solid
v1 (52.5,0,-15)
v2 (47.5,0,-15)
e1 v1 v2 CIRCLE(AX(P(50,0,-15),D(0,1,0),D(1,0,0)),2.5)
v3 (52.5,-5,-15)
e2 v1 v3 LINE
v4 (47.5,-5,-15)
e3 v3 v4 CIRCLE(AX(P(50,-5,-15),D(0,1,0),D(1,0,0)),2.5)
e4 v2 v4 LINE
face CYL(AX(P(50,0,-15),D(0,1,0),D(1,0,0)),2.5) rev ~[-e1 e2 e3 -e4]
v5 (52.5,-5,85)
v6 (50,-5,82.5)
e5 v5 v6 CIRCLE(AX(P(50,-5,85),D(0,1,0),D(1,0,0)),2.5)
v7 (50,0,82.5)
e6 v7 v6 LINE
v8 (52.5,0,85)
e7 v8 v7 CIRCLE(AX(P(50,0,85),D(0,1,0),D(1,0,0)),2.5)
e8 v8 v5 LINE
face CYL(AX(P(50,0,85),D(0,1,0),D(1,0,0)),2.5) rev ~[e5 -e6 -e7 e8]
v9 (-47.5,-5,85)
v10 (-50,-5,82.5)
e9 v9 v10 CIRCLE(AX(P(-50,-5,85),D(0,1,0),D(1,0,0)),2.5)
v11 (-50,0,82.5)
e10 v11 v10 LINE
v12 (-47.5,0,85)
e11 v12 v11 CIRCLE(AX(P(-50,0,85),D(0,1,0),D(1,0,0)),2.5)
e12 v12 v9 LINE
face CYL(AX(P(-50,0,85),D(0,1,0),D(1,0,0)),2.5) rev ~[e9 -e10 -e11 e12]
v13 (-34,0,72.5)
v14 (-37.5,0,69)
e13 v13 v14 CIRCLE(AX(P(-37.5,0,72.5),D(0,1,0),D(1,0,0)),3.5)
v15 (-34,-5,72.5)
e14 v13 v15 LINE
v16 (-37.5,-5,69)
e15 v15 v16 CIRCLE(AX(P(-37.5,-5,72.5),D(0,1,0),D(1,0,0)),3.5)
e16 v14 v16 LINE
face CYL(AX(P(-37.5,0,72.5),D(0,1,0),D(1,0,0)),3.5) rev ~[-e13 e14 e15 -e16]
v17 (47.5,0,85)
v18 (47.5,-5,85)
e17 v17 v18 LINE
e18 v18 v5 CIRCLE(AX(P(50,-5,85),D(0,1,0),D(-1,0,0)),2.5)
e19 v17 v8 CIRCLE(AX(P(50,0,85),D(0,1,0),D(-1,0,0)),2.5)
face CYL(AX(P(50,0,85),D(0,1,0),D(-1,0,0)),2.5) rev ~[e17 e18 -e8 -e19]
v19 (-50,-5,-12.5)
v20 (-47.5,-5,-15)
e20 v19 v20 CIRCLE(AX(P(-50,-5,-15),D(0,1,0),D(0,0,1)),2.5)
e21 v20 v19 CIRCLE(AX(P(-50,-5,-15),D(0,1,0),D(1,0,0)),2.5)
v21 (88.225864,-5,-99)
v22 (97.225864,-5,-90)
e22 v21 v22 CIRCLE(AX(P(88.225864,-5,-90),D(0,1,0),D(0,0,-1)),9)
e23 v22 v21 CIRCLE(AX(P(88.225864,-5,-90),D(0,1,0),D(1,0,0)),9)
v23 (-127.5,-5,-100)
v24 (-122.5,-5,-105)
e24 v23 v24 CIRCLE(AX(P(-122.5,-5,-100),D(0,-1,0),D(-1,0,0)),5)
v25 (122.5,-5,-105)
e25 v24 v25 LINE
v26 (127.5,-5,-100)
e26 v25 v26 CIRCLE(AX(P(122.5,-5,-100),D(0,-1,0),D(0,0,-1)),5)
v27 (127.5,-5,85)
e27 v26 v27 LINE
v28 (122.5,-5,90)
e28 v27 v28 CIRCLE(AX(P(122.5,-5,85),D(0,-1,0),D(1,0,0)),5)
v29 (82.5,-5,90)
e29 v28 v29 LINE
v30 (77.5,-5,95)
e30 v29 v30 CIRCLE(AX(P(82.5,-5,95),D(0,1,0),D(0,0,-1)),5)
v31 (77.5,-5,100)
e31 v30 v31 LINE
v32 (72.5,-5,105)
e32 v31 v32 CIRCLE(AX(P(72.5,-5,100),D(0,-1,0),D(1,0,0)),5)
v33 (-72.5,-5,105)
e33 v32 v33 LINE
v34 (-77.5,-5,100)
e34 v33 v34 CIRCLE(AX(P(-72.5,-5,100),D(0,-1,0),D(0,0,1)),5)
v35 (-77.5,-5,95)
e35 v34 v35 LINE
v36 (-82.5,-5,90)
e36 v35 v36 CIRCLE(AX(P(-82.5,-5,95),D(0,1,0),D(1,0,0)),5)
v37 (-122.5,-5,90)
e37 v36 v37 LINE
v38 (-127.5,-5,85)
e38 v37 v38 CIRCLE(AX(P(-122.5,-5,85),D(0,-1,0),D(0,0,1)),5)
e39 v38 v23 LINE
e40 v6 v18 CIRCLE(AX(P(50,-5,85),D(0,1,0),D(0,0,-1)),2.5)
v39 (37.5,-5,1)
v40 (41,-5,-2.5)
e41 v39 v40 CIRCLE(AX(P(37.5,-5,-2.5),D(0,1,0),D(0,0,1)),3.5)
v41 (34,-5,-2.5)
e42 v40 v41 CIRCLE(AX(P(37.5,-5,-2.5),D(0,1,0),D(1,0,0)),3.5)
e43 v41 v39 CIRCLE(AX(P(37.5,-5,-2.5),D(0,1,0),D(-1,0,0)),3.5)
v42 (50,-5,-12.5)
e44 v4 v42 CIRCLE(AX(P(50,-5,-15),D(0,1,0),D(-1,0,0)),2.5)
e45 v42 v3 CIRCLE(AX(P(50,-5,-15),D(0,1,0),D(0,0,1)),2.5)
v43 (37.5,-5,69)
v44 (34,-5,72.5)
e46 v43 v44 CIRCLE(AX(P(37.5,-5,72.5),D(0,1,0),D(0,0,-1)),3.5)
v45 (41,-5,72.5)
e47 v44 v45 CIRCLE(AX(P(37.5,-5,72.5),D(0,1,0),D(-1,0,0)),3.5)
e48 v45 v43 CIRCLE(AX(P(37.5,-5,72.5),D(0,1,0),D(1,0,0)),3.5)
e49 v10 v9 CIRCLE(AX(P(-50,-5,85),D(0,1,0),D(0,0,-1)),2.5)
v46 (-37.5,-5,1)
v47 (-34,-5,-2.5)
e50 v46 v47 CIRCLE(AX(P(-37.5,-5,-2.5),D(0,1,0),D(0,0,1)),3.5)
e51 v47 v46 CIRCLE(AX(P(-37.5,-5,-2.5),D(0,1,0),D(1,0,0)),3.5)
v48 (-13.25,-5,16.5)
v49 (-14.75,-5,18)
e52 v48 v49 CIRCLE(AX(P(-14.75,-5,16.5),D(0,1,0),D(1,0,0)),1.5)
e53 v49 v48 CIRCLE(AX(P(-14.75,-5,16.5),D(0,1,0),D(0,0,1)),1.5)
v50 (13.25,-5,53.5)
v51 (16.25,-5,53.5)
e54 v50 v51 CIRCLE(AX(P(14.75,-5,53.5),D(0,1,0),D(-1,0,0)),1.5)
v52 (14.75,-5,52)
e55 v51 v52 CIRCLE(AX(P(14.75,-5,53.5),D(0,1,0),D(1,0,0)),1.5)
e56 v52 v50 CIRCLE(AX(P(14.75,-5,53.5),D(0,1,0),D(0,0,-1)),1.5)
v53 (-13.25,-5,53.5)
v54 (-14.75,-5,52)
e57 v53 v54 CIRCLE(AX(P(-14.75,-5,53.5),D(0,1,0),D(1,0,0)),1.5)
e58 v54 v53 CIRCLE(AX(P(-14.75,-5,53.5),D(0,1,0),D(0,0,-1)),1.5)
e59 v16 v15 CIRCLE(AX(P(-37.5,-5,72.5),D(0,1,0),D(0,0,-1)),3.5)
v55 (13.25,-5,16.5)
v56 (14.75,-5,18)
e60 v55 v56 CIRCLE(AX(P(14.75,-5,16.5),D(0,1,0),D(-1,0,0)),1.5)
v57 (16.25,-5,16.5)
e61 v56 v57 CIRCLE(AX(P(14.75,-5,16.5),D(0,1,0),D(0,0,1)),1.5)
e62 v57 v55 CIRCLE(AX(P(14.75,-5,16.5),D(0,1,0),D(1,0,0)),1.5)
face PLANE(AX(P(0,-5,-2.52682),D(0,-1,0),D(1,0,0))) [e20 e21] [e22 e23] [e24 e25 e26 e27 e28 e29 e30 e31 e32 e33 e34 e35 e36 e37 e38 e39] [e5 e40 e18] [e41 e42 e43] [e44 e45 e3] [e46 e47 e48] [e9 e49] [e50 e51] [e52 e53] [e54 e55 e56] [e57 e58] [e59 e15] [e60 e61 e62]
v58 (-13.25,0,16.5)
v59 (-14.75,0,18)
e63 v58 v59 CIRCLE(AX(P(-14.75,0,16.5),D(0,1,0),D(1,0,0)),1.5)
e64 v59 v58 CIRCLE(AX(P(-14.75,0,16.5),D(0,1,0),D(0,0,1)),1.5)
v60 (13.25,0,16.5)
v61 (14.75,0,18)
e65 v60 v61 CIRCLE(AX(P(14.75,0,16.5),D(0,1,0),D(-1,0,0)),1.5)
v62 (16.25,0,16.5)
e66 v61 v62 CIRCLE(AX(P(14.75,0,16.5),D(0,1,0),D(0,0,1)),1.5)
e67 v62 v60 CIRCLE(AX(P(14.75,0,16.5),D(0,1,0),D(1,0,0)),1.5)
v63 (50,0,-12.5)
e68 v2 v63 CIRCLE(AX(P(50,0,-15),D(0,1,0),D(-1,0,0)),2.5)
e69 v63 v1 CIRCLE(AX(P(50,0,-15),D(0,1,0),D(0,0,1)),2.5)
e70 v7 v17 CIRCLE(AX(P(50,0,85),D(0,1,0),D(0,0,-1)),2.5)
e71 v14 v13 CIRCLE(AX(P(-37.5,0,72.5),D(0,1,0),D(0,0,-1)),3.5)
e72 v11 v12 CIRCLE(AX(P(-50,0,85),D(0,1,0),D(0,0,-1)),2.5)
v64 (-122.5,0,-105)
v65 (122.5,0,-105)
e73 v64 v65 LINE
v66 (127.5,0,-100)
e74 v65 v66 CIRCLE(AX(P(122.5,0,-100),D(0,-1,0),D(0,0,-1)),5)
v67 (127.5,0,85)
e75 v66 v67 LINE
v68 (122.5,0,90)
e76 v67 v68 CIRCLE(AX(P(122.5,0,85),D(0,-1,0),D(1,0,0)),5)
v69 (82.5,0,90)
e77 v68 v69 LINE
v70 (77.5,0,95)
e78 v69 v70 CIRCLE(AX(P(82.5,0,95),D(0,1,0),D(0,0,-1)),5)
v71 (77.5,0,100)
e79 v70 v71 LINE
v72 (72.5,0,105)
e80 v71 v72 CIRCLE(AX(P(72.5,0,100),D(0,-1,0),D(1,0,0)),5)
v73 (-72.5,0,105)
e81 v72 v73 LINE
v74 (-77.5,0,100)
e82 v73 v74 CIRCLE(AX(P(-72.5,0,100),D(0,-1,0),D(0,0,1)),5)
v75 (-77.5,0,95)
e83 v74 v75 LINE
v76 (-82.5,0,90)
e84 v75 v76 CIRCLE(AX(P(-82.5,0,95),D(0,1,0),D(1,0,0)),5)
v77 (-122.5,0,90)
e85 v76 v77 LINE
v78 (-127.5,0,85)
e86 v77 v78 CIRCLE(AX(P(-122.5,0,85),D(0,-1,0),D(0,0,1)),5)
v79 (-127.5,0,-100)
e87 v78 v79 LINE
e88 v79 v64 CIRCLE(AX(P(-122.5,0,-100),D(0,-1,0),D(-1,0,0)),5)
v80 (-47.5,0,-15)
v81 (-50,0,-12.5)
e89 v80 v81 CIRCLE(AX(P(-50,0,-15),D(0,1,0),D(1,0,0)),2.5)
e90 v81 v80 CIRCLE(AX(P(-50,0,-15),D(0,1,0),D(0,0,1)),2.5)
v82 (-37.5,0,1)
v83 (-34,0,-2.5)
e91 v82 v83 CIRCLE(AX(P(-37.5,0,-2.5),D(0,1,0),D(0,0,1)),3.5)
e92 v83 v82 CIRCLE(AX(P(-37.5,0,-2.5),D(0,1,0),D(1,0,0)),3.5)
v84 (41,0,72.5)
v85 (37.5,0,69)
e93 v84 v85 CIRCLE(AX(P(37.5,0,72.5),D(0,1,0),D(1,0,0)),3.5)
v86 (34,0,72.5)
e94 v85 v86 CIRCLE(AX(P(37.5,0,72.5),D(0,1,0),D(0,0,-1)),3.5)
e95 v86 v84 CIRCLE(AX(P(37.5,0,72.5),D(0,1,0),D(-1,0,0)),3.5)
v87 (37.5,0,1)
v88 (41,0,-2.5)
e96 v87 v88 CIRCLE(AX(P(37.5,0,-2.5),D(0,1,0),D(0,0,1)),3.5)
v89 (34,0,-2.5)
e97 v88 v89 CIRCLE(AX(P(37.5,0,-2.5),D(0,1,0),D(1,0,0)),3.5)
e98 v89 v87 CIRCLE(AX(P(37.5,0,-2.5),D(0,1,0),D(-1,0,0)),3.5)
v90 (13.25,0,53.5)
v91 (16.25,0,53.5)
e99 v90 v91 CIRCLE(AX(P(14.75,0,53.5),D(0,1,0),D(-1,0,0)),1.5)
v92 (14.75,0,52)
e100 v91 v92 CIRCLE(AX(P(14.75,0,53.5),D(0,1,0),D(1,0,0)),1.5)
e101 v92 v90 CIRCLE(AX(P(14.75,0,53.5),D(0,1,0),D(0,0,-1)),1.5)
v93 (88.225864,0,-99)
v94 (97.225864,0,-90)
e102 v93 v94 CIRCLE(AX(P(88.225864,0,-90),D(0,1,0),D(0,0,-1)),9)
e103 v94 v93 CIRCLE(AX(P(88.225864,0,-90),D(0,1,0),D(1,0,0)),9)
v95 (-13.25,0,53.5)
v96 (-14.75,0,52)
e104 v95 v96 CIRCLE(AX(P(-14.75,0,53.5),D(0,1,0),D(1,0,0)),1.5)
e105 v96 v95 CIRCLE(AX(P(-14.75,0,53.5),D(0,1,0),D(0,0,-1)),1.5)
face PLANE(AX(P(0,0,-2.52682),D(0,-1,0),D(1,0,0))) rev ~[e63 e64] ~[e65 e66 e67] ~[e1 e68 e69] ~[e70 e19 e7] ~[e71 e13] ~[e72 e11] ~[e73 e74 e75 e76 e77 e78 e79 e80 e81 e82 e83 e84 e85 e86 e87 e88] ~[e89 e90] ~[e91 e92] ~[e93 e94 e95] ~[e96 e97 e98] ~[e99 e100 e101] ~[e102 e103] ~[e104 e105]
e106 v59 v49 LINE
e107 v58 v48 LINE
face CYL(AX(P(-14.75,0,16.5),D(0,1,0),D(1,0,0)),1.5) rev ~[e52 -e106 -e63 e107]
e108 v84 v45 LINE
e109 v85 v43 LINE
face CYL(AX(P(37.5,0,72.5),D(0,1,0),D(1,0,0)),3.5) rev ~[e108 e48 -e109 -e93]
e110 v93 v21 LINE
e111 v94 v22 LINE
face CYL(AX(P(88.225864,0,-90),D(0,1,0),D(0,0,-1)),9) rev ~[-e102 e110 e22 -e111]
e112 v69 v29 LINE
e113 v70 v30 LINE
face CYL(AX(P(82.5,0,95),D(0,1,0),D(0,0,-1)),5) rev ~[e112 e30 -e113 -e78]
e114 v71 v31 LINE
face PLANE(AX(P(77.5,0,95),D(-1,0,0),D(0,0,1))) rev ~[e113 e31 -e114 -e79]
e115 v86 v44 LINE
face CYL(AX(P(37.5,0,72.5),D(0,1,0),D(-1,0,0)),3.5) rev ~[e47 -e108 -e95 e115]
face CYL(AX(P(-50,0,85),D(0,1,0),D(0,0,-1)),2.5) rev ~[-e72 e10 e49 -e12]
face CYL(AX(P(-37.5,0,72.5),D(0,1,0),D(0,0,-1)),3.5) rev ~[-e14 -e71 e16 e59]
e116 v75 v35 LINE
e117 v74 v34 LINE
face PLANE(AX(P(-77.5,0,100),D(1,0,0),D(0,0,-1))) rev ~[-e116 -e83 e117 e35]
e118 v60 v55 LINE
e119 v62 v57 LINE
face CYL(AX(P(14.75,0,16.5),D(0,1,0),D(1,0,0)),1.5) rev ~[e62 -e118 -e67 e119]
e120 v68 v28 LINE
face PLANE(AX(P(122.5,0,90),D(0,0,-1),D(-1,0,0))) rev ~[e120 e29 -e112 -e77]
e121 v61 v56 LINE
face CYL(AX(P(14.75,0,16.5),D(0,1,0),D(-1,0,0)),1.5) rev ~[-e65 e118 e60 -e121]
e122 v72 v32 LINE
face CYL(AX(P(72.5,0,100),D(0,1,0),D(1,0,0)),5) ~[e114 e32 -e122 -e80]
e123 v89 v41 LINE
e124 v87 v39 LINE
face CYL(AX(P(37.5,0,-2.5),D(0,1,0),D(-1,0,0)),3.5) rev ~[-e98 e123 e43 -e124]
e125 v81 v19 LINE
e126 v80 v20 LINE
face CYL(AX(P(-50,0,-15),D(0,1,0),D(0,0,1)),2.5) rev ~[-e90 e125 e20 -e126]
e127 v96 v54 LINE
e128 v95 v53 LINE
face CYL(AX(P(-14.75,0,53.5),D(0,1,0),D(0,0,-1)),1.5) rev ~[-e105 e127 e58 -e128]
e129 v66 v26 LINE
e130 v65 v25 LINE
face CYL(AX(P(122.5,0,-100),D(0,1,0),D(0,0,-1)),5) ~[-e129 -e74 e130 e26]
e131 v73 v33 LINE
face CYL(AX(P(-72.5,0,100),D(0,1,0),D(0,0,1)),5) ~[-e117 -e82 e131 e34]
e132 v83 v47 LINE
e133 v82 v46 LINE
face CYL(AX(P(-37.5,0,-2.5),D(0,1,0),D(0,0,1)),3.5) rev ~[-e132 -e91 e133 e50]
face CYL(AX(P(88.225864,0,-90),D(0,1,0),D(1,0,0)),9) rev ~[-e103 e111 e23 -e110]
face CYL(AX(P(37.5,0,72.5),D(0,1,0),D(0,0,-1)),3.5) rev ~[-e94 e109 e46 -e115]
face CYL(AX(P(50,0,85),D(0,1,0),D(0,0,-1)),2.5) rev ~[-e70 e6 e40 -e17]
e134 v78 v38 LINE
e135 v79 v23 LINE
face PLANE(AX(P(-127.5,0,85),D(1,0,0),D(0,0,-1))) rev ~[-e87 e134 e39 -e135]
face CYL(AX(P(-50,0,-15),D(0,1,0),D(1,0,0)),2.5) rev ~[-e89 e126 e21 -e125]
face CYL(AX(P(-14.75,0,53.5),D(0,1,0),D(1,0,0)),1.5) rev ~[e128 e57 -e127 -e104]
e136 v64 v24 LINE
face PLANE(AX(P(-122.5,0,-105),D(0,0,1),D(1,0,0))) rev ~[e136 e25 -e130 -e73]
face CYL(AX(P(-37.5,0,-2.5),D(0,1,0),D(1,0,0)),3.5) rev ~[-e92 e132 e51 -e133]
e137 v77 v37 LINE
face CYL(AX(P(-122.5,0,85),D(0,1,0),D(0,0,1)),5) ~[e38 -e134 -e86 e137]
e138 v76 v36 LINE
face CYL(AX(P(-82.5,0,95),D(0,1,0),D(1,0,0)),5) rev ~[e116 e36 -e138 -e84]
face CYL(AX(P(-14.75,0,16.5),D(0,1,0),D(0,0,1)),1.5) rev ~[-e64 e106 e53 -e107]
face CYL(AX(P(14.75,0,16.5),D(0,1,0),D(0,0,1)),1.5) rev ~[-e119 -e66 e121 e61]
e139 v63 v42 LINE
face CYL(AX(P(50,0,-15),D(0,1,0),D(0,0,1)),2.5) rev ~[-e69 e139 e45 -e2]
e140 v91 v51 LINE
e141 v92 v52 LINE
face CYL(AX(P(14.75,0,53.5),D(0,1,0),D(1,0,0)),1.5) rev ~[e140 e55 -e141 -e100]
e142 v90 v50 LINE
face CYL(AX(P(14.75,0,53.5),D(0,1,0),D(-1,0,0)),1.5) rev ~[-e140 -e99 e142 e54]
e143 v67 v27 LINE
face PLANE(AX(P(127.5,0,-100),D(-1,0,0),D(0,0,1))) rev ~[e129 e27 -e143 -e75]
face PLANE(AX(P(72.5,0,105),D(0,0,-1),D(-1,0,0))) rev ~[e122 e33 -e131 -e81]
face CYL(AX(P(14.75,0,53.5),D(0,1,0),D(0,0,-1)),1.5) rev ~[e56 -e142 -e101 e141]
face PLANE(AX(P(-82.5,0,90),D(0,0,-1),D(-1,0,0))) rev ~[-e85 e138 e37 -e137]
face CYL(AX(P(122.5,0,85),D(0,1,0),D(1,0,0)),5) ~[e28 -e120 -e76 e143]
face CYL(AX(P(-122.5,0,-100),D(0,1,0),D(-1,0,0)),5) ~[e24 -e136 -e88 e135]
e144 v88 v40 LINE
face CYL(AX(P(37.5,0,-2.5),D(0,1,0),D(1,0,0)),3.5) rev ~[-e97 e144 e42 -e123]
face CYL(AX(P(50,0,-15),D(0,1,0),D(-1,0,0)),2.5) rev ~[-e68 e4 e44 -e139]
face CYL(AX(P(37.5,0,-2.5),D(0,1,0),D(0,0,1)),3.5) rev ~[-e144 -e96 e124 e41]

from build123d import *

# Parameters (mm, degrees)
F1_DEPTH = 5


with BuildPart() as f1:
    # F0 (on Front) → F1 (new body)
    with BuildSketch(Plane.XZ):
        with BuildLine():
            Line((88.225863874, -105), (122.5, -105))
            ThreePointArc((122.5, -105), (126.0355339059, -103.5355339059), (127.5, -100))
            Line((127.5, -100), (127.5, 85))
            ThreePointArc((127.5, 85), (126.0355339059, 88.5355339059), (122.5, 90))
            Line((122.5, 90), (82.5, 90))
            ThreePointArc((82.5, 90), (78.9644660941, 91.4644660941), (77.5, 95))
            Line((77.5, 95), (77.5, 100))
            ThreePointArc((77.5, 100), (76.0355339059, 103.5355339059), (72.5, 105))
            Line((72.5, 105), (0, 105))
            Line((0, 105), (-72.5, 105))
            ThreePointArc((-72.5, 105), (-76.0355339059, 103.5355339059), (-77.5, 100))
            Line((-77.5, 100), (-77.5, 95))
            ThreePointArc((-77.5, 95), (-78.9644660941, 91.4644660941), (-82.5, 90))
            Line((-82.5, 90), (-122.5, 90))
            ThreePointArc((-122.5, 90), (-126.0355339059, 88.5355339059), (-127.5, 85))
            Line((-127.5, 85), (-127.5, -100))
            ThreePointArc((-127.5, -100), (-126.0355339059, -103.5355339059), (-122.5, -105))
            Line((-122.5, -105), (88.225863874, -105))
        make_face()
        with BuildLine():
            ThreePointArc((97.225863874, -90), (94.5898249046, -96.3639610307), (88.225863874, -99))
            ThreePointArc((88.225863874, -99), (81.8619028433, -83.6360389693), (97.225863874, -90))
        make_face(mode=Mode.SUBTRACT)
        with BuildLine():
            Line((-47.5, 85), (0, 85))
            Line((0, 85), (47.5, 85))
            ThreePointArc((47.5, 85), (50, 87.5), (52.5, 85))
            ThreePointArc((52.5, 85), (51.767766953, 83.232233047), (50, 82.5))
            Line((50, 82.5), (50, -12.5))
            ThreePointArc((50, -12.5), (51.767766953, -13.232233047), (52.5, -15))
            ThreePointArc((52.5, -15), (50, -17.5), (47.5, -15))
            Line((47.5, -15), (-47.5, -15))
            ThreePointArc((-47.5, -15), (-51.767766953, -16.767766953), (-50, -12.5))
            Line((-50, -12.5), (-50, 82.5))
            ThreePointArc((-50, 82.5), (-51.767766953, 86.767766953), (-47.5, 85))
        make_face(mode=Mode.SUBTRACT)
        with BuildLine():
            Line((47.5, 85), (0, 85))
            Line((0, 85), (-47.5, 85))
            ThreePointArc((-47.5, 85), (-48.232233047, 83.232233047), (-50, 82.5))
            Line((-50, 82.5), (-50, -12.5))
            ThreePointArc((-50, -12.5), (-48.232233047, -13.232233047), (-47.5, -15))
            Line((-47.5, -15), (47.5, -15))
            ThreePointArc((47.5, -15), (48.232233047, -13.232233047), (50, -12.5))
            Line((50, -12.5), (50, 82.5))
            ThreePointArc((50, 82.5), (48.232233047, 83.232233047), (47.5, 85))
        make_face()
        with BuildLine():
            Line((34, -2.5), (-34, -2.5))
            ThreePointArc((-34, -2.5), (-39.9748737342, -4.9748737342), (-37.5, 1))
            Line((-37.5, 1), (-37.5, 69))
            ThreePointArc((-37.5, 69), (-39.9748737342, 74.9748737342), (-34, 72.5))
            Line((-34, 72.5), (34, 72.5))
            ThreePointArc((34, 72.5), (37.5, 76), (41, 72.5))
            ThreePointArc((41, 72.5), (39.9748737342, 70.0251262658), (37.5, 69))
            Line((37.5, 69), (37.5, 1))
            ThreePointArc((37.5, 1), (39.9748737342, -0.0251262658), (41, -2.5))
            ThreePointArc((41, -2.5), (37.5, -6), (34, -2.5))
        make_face(mode=Mode.SUBTRACT)
        with BuildLine():
            ThreePointArc((-37.5, 1), (-35.0251262658, -0.0251262658), (-34, -2.5))
            Line((-34, -2.5), (34, -2.5))
            ThreePointArc((34, -2.5), (35.0251262658, -0.0251262658), (37.5, 1))
            Line((37.5, 1), (37.5, 69))
            ThreePointArc((37.5, 69), (35.0251262658, 70.0251262658), (34, 72.5))
            Line((34, 72.5), (-34, 72.5))
            ThreePointArc((-34, 72.5), (-35.0251262658, 70.0251262658), (-37.5, 69))
            Line((-37.5, 69), (-37.5, 1))
        make_face()
        with BuildLine():
            Line((13.25, 16.5), (-13.25, 16.5))
            ThreePointArc((-13.25, 16.5), (-15.8106601718, 15.4393398282), (-14.75, 18))
            Line((-14.75, 18), (-14.75, 52))
            ThreePointArc((-14.75, 52), (-15.8106601718, 54.5606601718), (-13.25, 53.5))
            Line((-13.25, 53.5), (13.25, 53.5))
            ThreePointArc((13.25, 53.5), (14.75, 55), (16.25, 53.5))
            ThreePointArc((16.25, 53.5), (15.8106601718, 52.4393398282), (14.75, 52))
            Line((14.75, 52), (14.75, 18))
            ThreePointArc((14.75, 18), (15.8106601718, 17.5606601718), (16.25, 16.5))
            ThreePointArc((16.25, 16.5), (14.75, 15), (13.25, 16.5))
        make_face(mode=Mode.SUBTRACT)
        with BuildLine():
            ThreePointArc((-14.75, 18), (-13.6893398282, 17.5606601718), (-13.25, 16.5))
            Line((-13.25, 16.5), (13.25, 16.5))
            ThreePointArc((13.25, 16.5), (13.6893398282, 17.5606601718), (14.75, 18))
            Line((14.75, 18), (14.75, 52))
            ThreePointArc((14.75, 52), (13.6893398282, 52.4393398282), (13.25, 53.5))
            Line((13.25, 53.5), (-13.25, 53.5))
            ThreePointArc((-13.25, 53.5), (-13.6893398282, 52.4393398282), (-14.75, 52))
            Line((-14.75, 52), (-14.75, 18))
        make_face()
    extrude(amount=F1_DEPTH)


solid = f1.part
